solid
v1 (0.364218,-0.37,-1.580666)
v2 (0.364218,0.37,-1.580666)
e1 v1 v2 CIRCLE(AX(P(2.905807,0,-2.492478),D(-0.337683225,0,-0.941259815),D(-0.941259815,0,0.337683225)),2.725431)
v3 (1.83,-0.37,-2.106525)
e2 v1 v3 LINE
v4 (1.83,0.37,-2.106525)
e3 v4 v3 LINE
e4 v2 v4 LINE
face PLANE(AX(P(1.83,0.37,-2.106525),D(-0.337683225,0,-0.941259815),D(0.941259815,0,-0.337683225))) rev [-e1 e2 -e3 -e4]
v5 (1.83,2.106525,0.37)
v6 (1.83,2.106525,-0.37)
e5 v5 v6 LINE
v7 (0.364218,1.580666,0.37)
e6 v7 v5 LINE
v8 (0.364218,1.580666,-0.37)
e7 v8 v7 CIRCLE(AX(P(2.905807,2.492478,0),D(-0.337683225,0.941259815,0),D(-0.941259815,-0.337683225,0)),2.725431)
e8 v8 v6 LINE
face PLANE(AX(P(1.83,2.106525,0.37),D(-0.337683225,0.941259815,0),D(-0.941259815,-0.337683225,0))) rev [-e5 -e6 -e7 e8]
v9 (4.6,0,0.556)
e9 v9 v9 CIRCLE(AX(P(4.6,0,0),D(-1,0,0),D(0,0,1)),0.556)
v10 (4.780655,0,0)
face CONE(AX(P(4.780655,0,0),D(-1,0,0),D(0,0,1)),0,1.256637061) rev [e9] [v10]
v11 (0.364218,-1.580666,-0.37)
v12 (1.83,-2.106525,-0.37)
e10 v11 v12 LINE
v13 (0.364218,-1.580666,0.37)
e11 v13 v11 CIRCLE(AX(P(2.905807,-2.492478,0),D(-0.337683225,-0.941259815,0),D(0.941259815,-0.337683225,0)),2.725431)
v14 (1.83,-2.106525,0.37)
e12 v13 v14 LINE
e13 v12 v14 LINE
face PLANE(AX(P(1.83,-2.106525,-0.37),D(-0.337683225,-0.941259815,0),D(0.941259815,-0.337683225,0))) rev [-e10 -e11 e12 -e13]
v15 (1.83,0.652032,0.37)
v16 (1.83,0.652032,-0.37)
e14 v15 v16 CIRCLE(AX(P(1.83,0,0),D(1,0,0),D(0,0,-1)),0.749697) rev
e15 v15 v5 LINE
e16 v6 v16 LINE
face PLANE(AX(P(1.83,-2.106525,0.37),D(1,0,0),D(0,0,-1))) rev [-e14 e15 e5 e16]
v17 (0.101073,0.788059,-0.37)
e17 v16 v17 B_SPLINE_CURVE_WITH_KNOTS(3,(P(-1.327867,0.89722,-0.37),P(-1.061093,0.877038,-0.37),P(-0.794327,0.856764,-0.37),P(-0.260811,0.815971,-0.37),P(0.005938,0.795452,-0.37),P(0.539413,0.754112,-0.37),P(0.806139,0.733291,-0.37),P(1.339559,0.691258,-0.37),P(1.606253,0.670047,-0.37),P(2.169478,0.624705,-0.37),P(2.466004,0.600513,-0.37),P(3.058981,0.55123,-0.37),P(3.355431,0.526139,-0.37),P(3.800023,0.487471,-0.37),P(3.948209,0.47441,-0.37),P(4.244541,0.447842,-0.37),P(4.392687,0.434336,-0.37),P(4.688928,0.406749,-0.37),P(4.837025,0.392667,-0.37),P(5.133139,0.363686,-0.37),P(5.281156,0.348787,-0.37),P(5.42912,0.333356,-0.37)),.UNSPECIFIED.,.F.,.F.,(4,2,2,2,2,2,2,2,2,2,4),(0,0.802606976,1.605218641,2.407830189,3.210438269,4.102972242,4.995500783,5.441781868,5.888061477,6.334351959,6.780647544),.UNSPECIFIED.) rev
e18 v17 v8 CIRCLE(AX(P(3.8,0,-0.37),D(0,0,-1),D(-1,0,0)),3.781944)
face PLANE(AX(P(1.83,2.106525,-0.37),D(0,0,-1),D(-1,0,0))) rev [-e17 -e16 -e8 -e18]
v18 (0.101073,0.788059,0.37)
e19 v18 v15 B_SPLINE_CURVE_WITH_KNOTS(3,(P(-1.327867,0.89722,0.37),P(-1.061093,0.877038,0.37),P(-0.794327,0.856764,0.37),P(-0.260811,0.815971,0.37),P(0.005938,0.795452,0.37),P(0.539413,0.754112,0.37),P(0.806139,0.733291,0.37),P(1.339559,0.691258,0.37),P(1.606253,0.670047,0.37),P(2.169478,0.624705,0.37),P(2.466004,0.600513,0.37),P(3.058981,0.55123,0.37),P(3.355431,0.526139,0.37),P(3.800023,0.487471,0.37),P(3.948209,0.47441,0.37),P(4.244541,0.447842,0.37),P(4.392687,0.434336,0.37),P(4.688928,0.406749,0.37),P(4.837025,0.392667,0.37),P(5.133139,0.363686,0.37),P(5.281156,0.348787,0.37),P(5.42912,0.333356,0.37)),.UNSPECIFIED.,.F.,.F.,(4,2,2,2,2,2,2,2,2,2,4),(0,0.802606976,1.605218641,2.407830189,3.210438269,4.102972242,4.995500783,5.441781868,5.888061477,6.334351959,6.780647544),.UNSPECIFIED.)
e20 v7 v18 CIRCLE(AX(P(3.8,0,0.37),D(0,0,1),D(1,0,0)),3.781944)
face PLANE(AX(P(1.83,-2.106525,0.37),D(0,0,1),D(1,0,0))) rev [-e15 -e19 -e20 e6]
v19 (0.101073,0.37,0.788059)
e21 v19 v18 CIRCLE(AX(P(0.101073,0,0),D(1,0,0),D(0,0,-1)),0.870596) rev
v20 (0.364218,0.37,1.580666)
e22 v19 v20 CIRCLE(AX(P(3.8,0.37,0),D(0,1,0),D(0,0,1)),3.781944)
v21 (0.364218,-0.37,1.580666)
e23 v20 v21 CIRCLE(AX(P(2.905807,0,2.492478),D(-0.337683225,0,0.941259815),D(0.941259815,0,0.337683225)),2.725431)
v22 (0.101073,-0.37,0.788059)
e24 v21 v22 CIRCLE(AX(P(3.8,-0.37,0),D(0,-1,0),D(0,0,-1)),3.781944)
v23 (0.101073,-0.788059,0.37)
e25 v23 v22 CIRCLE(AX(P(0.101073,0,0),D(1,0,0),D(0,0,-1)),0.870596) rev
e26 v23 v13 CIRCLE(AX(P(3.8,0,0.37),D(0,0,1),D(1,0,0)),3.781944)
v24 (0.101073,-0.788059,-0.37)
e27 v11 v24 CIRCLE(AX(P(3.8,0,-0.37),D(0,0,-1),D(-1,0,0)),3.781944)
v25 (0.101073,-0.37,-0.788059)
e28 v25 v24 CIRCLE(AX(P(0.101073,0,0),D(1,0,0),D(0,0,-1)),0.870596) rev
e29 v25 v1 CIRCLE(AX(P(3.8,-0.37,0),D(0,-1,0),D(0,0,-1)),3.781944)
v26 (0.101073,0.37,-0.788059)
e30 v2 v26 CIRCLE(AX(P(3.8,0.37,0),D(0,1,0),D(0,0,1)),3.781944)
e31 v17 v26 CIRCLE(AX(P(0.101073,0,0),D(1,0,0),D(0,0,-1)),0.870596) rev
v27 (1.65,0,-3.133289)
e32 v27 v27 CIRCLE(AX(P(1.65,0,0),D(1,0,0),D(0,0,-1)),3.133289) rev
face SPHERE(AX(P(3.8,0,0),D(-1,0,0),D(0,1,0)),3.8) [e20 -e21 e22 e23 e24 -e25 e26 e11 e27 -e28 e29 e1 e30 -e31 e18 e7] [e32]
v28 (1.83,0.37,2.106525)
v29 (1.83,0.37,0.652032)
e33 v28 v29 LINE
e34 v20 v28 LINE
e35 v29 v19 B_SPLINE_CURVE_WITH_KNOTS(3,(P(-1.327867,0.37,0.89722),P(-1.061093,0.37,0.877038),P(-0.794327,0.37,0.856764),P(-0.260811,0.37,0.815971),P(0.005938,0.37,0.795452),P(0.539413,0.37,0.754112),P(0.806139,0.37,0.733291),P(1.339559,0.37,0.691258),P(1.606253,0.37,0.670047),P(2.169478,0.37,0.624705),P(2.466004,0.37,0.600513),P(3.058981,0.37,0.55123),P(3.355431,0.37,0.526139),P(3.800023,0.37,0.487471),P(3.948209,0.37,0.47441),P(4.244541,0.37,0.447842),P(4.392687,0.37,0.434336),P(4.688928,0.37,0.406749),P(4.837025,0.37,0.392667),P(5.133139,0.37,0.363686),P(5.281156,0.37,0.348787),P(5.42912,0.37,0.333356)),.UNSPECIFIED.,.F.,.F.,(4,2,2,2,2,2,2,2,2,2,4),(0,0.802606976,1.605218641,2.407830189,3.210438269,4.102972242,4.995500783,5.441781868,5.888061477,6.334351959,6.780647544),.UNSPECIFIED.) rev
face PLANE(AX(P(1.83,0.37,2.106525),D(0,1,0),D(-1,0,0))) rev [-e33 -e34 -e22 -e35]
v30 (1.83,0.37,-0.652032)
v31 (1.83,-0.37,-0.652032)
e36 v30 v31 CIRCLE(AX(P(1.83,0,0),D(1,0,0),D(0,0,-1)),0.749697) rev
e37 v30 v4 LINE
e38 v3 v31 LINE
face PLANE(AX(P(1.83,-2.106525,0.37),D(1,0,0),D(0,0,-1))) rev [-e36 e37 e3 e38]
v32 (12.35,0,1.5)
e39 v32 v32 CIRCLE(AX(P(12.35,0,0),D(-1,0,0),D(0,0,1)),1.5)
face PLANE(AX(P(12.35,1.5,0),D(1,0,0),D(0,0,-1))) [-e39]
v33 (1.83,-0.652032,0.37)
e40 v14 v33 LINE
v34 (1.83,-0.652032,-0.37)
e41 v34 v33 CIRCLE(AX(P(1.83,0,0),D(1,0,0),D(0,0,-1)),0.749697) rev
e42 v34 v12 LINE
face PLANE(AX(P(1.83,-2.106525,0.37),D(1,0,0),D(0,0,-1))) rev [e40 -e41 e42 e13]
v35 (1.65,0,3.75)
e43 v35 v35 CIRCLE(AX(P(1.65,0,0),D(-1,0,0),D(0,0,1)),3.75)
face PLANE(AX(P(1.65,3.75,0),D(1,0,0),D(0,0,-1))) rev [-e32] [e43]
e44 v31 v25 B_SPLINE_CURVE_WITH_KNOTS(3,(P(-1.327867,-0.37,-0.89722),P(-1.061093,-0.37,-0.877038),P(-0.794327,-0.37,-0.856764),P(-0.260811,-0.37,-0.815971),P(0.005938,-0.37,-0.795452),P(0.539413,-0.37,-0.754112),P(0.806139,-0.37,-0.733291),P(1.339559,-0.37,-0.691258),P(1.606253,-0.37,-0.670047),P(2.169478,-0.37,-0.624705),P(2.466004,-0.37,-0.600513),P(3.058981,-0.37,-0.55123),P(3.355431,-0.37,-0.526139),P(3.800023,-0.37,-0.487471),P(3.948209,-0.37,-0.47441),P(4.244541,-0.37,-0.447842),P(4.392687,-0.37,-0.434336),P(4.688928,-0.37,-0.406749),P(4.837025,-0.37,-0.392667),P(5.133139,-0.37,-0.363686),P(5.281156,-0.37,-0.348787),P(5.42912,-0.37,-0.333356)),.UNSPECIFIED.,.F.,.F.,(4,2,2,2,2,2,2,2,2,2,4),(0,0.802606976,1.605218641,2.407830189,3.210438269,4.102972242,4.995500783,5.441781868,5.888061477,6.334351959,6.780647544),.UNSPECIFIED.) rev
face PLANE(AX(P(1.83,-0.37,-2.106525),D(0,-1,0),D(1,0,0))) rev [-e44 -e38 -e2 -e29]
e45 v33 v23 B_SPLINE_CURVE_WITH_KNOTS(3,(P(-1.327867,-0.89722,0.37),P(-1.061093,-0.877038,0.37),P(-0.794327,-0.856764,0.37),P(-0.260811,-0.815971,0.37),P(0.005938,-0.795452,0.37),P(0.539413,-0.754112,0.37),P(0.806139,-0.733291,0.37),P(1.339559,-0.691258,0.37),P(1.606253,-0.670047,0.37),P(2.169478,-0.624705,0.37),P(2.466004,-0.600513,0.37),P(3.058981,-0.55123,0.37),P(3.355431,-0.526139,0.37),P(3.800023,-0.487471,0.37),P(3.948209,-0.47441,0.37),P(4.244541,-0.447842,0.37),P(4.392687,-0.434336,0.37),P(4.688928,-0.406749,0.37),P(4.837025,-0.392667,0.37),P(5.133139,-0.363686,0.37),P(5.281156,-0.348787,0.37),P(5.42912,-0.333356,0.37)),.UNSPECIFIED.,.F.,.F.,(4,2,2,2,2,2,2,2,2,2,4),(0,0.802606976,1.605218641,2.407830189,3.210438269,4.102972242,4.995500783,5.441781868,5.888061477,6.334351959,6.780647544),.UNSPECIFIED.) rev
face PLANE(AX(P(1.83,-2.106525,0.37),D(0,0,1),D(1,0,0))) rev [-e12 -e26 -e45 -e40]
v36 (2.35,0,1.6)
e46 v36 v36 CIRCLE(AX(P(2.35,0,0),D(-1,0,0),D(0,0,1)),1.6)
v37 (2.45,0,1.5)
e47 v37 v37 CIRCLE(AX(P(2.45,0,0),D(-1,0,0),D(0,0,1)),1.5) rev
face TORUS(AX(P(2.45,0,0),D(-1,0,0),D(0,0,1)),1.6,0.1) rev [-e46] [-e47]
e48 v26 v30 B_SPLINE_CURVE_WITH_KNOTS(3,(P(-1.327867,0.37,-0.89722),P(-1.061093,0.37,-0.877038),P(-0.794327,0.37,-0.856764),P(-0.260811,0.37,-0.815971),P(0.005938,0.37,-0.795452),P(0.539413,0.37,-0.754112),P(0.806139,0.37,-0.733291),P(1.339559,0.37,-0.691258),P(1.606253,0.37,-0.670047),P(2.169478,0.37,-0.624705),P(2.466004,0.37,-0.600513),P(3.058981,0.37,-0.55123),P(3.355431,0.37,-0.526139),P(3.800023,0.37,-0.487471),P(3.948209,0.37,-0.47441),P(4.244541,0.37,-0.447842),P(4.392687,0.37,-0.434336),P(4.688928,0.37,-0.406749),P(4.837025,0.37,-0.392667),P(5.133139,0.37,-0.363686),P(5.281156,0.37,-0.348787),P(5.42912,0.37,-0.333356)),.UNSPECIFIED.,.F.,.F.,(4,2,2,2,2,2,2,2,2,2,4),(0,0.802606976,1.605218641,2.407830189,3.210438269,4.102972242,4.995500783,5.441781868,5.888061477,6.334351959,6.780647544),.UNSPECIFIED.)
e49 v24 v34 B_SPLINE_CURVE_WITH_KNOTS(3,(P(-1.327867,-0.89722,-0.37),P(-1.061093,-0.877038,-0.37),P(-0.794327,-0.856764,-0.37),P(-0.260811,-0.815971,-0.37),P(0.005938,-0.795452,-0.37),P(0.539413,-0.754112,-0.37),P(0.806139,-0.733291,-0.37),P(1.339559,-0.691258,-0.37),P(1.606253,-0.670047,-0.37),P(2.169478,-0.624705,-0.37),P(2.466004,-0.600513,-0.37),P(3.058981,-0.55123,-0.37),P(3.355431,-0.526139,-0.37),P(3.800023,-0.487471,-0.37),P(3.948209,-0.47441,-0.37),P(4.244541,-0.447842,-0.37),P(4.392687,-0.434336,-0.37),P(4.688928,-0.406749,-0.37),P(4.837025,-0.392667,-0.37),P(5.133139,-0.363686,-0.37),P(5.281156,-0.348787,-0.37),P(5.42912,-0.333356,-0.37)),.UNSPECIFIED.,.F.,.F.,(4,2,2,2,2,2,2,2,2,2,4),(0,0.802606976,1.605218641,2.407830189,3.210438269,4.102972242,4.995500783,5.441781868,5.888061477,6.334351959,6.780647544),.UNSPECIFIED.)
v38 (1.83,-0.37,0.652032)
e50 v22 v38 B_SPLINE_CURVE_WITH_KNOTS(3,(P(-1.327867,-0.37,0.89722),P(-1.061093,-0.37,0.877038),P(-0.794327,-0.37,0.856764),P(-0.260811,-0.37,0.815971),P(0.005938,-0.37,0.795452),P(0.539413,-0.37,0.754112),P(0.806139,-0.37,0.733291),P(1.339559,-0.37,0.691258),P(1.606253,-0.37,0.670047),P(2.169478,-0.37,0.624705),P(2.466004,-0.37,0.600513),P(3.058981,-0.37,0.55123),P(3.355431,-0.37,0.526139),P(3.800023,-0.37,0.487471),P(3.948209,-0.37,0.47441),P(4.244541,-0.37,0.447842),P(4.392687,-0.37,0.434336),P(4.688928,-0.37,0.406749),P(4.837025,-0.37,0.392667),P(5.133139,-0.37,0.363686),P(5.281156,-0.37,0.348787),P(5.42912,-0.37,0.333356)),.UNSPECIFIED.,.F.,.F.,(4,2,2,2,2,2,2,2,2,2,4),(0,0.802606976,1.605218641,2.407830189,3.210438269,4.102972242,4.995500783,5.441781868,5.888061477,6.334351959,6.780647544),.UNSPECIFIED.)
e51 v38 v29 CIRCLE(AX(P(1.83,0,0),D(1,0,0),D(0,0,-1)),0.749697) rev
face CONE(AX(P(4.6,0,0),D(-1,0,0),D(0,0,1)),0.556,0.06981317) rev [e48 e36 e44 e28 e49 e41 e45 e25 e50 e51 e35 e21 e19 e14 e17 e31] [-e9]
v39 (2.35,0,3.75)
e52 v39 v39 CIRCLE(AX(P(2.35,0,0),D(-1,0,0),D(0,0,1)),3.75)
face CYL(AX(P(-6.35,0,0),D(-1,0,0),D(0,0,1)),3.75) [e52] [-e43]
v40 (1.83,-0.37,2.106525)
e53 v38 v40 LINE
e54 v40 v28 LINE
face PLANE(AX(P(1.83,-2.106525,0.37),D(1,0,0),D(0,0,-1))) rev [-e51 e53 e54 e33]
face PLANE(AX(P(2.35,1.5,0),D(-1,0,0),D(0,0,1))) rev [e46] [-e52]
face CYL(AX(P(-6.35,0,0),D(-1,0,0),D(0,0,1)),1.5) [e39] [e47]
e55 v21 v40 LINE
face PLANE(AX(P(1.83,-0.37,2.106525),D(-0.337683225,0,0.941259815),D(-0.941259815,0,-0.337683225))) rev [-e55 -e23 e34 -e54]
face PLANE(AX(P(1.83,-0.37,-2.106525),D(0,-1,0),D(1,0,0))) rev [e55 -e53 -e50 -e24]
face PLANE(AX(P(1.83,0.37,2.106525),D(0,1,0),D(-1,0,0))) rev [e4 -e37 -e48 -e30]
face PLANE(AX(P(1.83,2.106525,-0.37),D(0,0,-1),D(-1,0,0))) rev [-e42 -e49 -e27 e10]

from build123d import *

# Parameters (mm, degrees)
RECPAT_COUNT = 2
RECPAT_ANGLE = 90


with BuildPart() as part:
    # Fillet1: read off the stored shape, not the designer's step
    # Fillet1 outline → Fillet1 (revolve)
    with BuildSketch(Plane.YX):
        with BuildLine():
            Line((1.5, 2.45), (1.5, 12.35))
            Line((1.5, 12.35), (0, 12.35))
            Line((0, 12.35), (0, 1.65))
            Line((0, 1.65), (3.75, 1.65))
            Line((3.75, 1.65), (3.75, 2.35))
            Line((3.75, 2.35), (1.6, 2.35))
            ThreePointArc((1.6, 2.35), (1.529289322, 2.379289322), (1.5, 2.45))
        make_face()
    revolve(axis=Axis((0, 0, 0), (1, 0, 0)))

    # PanSke → Pan (revolve)
    with BuildSketch(Plane.XY, mode=Mode.PRIVATE) as pan_sk:
        with BuildLine():
            Line((1.65, 3.133289007), (1.65, 0))
            Line((1.65, 0), (0, 0))
            ThreePointArc((0, 0), (0.437709114, 1.770593121), (1.65, 3.133289007))
        make_face()
    revolve(pan_sk.sketch.rotate(Axis((0, 0, 0), (1, 0, 0)), 90), axis=Axis((0, 0, 0), (1, 0, 0)))

    # Sketch3 → Recess section 0
    with BuildSketch(Plane(origin=(0, 0, 0), x_dir=(0, 0, -1), z_dir=(1, 0, 0))):
        with BuildLine():
            Line((-0.37, 1.45), (0.37, 1.45))
            Line((0.37, 1.45), (0.37, -1.45))
            Line((0.37, -1.45), (-0.37, -1.45))
            Line((-0.37, -1.45), (-0.37, 1.45))
        make_face()
    # Sketch4 → Recess section 1
    with BuildSketch(Plane(origin=(1.83, 0, 0), x_dir=(0, 0, -1), z_dir=(1, 0, 0))):
        with BuildLine():
            Line((-0.37, 2.106524682), (0.37, 2.106524682))
            Line((0.37, 2.106524682), (0.37, -2.106524682))
            Line((0.37, -2.106524682), (-0.37, -2.106524682))
            Line((-0.37, -2.106524682), (-0.37, 2.106524682))
        make_face()
    recess = loft(mode=Mode.SUBTRACT)

    # RecPat: Recess ×2 about axis
    recpat_axis = Axis((0, 0, 0), (1, 0, 0))
    for i in range(1, RECPAT_COUNT):
        add(recess.rotate(recpat_axis, i * RECPAT_ANGLE / (RECPAT_COUNT - 1)), mode=Mode.SUBTRACT)

    # RecCorSke → RecessCore (revolve, cut)
    with BuildSketch(Plane.XY, mode=Mode.PRIVATE) as recesscore_sk:
        Polygon((0, 0), (0, 0.877663335), (4.6, 0.556), (4.780655351, 0), align=None)
    revolve(recesscore_sk.sketch.rotate(Axis((-3.175, 0, 0), (1, 0, 0)), 90), axis=Axis((-3.175, 0, 0), (1, 0, 0)), mode=Mode.SUBTRACT)


solid = part.part
